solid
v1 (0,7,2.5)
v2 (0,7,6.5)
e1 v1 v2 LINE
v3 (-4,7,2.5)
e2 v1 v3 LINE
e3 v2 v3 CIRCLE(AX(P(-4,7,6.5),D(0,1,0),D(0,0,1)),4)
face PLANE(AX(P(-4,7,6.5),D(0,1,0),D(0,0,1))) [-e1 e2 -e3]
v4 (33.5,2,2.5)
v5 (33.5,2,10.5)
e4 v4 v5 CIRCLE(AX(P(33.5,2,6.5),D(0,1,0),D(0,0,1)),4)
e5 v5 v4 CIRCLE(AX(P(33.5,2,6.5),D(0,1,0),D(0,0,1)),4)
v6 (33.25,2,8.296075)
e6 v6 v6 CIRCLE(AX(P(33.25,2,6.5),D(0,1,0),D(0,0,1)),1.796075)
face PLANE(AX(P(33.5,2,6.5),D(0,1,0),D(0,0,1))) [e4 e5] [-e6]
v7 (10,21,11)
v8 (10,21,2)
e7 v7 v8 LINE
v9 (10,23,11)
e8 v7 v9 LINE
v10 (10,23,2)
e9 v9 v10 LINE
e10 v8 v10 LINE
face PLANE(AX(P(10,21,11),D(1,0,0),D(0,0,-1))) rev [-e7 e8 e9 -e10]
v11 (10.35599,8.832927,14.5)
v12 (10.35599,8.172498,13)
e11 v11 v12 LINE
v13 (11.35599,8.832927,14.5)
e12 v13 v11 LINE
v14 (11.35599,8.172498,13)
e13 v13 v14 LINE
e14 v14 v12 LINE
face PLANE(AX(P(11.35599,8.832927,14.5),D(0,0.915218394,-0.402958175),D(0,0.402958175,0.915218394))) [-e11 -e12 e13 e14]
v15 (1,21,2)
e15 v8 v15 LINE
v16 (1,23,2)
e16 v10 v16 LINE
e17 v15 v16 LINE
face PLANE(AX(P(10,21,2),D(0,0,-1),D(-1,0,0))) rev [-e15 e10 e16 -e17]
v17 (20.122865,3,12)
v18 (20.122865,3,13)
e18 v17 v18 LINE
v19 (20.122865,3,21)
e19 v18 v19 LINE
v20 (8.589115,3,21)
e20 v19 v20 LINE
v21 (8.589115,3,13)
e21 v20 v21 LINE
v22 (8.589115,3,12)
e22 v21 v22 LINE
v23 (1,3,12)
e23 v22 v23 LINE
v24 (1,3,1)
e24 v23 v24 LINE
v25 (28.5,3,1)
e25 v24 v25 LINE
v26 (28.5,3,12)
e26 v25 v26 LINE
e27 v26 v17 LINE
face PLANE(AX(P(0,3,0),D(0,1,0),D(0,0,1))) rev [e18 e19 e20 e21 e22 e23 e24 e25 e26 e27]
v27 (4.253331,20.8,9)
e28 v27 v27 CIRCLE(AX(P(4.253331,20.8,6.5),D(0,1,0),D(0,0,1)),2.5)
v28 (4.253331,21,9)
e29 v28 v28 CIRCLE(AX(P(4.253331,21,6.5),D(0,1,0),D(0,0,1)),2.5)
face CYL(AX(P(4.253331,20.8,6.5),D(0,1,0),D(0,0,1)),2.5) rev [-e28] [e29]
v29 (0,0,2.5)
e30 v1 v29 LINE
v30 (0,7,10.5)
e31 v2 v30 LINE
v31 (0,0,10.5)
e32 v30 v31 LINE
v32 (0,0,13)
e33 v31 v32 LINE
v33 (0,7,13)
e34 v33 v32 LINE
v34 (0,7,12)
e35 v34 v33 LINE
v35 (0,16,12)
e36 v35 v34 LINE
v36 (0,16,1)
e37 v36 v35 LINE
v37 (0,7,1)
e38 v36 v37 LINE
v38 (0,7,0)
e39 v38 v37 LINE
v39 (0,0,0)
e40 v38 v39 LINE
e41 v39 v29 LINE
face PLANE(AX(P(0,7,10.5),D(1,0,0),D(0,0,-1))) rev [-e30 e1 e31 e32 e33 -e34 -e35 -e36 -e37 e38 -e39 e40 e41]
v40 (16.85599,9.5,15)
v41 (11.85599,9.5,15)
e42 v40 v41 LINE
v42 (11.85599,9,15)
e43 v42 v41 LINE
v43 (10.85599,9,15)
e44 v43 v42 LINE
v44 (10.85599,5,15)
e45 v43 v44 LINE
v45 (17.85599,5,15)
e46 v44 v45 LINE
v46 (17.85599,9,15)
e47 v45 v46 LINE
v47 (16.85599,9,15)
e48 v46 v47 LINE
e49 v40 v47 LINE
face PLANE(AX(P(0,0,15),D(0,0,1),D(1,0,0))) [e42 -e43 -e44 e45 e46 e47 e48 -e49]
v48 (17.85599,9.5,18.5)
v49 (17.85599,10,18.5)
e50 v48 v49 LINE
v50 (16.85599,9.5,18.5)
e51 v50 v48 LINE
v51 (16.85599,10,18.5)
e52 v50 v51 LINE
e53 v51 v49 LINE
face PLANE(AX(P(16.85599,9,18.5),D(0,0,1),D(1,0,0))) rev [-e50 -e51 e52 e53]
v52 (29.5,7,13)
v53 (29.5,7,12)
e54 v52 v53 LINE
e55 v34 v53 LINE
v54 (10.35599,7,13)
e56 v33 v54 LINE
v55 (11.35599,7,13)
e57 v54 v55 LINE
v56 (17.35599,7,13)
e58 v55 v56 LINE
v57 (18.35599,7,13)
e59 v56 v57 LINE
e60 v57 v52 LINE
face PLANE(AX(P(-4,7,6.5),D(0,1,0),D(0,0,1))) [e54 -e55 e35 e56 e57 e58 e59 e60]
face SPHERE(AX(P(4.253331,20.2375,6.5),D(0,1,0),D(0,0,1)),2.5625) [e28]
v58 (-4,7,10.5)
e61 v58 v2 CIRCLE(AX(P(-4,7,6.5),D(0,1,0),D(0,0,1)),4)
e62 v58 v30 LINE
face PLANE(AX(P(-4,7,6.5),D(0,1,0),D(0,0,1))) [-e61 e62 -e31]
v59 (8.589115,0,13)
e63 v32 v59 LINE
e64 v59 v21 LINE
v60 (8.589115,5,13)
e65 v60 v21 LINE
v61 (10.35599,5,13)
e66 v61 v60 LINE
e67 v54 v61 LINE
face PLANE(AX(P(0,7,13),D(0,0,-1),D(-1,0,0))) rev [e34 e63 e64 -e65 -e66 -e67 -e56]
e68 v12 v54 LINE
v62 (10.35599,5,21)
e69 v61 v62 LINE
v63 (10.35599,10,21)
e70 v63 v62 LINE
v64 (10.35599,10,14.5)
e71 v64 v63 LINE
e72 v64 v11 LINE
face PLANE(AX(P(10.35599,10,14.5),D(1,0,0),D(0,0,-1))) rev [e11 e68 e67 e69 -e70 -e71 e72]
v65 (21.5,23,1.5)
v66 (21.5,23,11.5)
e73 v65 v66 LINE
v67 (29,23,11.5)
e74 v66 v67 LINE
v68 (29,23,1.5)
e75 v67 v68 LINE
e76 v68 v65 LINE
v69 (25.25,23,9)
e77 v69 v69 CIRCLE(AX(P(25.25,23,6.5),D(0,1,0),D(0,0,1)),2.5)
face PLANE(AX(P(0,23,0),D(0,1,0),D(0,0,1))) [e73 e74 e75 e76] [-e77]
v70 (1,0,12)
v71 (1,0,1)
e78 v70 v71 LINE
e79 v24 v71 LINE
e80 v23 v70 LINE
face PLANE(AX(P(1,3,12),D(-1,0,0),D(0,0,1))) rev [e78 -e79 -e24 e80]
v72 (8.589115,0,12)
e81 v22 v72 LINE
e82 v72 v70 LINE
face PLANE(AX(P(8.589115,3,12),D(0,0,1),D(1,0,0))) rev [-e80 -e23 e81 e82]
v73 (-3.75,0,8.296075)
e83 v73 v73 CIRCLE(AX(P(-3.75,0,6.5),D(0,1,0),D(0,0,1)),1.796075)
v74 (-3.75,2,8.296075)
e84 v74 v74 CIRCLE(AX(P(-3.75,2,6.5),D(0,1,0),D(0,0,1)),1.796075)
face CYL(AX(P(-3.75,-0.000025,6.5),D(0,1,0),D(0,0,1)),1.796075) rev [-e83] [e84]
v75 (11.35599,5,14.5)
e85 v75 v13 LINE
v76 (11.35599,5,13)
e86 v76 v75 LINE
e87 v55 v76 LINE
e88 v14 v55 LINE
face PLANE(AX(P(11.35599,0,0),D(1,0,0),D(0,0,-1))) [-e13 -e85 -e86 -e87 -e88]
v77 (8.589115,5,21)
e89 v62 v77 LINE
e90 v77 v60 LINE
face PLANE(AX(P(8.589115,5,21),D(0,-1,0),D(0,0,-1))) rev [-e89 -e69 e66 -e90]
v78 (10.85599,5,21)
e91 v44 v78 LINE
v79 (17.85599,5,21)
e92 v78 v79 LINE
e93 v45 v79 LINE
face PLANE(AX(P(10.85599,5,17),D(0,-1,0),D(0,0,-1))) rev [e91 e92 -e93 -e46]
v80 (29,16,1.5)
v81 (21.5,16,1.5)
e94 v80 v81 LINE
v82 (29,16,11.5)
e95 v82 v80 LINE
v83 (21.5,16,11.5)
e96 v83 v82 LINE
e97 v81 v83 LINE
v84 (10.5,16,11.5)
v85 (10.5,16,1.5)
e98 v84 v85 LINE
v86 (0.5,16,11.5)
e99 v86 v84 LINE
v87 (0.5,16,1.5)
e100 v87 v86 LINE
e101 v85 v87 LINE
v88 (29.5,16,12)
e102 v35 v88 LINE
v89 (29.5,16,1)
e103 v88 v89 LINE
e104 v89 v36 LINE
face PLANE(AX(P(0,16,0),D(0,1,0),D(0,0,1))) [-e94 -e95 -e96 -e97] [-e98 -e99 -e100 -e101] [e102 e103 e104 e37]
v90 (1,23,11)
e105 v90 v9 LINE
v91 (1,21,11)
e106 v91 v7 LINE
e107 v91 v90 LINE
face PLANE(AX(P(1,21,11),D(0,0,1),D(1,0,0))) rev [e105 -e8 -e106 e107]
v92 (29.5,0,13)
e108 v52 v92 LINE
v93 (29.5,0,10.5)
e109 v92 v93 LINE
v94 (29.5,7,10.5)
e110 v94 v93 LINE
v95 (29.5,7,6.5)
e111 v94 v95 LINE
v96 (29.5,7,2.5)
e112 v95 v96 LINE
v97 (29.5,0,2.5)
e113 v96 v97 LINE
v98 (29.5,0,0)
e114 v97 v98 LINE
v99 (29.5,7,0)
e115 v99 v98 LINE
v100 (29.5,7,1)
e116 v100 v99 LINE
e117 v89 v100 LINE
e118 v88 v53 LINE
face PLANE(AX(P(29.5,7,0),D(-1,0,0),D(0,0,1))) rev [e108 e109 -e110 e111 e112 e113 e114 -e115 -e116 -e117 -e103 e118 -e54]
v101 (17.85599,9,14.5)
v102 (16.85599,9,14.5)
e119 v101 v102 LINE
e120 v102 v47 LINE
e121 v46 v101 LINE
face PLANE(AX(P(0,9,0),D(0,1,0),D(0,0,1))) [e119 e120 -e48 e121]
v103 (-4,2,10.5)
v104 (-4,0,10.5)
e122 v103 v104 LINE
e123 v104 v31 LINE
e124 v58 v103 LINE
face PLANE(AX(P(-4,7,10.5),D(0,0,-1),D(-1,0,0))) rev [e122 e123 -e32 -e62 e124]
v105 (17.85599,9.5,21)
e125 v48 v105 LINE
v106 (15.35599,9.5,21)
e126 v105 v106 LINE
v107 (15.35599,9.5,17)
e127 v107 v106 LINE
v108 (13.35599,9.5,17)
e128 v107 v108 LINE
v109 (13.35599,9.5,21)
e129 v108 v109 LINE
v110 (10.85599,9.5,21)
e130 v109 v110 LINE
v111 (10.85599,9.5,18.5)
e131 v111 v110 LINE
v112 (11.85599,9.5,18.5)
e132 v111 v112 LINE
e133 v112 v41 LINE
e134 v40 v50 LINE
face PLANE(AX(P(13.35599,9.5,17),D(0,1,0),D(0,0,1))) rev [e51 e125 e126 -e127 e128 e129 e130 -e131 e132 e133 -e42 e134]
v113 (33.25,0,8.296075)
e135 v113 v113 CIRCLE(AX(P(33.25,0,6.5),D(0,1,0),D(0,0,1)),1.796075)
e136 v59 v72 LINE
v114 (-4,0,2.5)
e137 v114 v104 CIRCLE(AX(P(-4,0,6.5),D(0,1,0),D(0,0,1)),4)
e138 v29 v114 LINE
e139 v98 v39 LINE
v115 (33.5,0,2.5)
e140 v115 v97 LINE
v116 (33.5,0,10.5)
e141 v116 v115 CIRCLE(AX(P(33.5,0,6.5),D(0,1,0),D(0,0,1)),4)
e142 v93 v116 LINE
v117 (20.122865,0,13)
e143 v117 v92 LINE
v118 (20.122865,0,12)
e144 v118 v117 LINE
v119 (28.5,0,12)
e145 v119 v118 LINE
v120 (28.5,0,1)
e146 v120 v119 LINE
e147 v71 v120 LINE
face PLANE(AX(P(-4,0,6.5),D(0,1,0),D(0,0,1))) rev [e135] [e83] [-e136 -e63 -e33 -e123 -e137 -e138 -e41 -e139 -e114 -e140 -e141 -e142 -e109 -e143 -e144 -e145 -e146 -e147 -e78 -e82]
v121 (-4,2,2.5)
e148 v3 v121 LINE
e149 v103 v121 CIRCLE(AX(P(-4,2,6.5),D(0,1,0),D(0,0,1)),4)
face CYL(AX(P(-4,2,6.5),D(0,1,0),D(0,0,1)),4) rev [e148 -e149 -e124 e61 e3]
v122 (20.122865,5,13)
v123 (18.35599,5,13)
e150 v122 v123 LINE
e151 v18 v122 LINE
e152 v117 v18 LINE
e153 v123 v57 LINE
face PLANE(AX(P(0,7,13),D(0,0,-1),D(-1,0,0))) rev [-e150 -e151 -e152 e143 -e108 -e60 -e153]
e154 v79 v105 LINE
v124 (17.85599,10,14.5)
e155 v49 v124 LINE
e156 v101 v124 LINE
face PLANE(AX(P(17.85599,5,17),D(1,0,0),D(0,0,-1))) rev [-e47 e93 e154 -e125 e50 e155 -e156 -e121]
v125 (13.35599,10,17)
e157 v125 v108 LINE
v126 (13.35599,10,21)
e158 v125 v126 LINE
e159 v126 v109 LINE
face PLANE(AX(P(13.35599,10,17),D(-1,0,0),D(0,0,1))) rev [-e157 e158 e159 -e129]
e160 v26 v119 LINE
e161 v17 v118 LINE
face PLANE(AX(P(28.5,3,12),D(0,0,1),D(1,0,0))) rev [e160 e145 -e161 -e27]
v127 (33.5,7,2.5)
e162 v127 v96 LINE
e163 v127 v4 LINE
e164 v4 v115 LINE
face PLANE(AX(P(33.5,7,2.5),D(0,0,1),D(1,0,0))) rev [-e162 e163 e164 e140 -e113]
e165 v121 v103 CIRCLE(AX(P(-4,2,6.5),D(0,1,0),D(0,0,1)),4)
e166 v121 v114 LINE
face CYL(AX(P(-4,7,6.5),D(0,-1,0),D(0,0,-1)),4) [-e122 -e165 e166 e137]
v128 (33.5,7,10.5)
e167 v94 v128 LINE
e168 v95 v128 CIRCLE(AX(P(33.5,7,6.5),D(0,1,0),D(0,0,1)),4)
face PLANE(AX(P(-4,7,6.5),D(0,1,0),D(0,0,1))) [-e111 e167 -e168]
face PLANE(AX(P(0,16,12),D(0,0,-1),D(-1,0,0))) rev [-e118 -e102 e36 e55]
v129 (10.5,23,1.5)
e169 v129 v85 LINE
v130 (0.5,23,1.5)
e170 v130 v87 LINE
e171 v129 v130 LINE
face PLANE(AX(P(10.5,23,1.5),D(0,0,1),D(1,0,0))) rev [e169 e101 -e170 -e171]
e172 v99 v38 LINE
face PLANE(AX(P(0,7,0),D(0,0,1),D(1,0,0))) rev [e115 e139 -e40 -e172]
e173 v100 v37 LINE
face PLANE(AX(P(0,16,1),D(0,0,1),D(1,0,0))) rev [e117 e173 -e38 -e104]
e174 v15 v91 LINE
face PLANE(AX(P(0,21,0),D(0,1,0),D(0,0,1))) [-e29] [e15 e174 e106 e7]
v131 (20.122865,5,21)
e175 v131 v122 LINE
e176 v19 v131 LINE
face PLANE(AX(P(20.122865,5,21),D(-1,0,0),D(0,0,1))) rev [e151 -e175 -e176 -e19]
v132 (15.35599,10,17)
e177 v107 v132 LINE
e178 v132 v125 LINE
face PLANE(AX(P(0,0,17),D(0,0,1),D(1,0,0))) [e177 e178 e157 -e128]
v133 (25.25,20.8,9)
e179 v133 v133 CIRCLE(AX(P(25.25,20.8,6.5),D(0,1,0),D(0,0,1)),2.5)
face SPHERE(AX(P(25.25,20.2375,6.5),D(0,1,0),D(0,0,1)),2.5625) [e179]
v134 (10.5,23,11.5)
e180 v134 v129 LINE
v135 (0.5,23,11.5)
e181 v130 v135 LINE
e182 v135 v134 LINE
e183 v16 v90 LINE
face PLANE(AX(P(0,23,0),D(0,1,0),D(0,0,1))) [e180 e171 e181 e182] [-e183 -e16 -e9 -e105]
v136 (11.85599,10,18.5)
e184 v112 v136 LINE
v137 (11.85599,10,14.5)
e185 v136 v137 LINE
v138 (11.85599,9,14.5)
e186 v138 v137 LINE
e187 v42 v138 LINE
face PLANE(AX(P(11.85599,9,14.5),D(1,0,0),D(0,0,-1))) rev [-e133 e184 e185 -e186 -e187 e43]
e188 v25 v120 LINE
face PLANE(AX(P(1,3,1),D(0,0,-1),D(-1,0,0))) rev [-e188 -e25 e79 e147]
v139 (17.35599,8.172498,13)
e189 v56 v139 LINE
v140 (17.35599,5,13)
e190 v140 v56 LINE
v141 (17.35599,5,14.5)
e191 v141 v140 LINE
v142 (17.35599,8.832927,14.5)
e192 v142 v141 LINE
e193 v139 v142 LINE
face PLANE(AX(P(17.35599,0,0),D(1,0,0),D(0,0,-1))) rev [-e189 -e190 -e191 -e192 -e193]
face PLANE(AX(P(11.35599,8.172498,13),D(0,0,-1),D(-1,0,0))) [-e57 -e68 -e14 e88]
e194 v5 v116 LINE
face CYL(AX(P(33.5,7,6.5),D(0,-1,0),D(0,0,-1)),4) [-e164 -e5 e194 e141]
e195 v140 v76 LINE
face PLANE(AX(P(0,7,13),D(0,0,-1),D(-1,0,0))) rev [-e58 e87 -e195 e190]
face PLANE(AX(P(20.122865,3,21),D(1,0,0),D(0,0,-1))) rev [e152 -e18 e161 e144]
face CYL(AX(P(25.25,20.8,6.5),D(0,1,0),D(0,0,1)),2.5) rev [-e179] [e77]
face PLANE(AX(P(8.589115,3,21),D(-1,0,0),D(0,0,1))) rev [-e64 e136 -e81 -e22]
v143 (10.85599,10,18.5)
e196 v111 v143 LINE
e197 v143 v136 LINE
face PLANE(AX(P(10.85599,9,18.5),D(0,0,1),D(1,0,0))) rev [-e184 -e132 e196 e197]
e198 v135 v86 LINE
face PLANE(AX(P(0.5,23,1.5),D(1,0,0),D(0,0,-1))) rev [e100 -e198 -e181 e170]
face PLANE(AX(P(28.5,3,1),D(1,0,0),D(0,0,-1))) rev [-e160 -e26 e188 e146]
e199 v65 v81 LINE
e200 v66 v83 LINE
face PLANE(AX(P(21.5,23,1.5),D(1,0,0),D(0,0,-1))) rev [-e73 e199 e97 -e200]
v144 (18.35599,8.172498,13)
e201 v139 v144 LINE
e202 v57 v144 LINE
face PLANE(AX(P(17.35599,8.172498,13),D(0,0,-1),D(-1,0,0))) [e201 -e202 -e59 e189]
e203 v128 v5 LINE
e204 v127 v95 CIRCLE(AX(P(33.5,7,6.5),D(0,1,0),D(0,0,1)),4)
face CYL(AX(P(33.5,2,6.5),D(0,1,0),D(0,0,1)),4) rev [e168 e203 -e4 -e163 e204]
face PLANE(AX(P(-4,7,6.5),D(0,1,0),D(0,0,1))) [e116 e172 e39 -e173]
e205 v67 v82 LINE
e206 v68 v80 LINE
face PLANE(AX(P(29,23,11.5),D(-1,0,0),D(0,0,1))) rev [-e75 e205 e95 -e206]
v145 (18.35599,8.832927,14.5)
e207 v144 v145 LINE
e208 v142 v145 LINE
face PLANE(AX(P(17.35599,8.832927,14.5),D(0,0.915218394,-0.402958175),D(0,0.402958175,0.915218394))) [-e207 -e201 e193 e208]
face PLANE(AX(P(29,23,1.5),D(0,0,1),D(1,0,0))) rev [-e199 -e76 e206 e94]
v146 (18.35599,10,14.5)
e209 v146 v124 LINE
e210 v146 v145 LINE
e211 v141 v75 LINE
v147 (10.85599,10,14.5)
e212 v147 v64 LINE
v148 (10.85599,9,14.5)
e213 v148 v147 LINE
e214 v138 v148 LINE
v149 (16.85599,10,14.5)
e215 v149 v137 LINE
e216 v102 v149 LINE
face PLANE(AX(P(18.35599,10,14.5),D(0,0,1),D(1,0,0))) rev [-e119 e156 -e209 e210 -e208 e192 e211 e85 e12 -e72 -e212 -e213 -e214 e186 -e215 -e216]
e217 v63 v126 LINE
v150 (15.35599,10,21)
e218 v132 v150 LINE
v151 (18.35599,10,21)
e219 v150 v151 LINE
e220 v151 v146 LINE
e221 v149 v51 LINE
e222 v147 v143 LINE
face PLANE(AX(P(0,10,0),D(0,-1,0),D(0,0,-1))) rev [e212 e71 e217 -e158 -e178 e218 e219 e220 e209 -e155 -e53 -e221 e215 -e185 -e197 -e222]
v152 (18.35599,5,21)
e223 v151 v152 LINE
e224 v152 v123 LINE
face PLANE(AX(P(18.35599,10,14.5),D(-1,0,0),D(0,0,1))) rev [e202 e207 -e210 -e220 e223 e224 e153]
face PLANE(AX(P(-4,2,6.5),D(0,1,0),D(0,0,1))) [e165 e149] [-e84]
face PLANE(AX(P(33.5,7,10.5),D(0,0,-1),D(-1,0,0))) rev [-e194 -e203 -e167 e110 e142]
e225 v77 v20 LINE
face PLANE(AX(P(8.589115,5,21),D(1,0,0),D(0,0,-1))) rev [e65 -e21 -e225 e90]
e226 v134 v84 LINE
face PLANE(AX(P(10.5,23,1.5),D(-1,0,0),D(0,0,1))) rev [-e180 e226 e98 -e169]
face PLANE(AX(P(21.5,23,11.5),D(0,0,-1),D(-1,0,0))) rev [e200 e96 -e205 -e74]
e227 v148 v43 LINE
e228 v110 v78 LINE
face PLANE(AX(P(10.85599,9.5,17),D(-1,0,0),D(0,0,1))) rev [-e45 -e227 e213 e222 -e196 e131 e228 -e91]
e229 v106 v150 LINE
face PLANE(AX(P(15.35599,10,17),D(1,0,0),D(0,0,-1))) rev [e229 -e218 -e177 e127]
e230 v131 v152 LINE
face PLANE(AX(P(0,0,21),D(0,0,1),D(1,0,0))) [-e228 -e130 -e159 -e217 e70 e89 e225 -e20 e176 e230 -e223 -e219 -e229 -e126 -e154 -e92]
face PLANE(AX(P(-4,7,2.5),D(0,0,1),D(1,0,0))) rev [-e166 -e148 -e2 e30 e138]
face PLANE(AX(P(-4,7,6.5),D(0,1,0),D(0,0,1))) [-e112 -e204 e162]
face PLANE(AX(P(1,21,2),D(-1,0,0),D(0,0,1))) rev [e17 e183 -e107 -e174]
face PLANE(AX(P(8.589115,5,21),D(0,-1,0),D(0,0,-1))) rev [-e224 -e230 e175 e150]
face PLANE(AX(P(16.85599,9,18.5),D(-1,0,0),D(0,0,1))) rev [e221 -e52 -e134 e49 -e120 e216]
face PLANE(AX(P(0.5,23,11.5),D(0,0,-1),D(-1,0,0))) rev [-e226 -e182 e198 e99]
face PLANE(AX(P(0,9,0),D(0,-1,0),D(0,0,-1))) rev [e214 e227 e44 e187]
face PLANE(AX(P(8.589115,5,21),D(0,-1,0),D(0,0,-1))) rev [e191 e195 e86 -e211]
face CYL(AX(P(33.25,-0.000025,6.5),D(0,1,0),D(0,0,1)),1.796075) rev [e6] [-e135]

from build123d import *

# Parameters (mm, degrees)
EXTRUDE_1_DEPTH     = 7
CUT_EXTRUDE_START   = -5
SKETCH_2_R          = 4
CUT_EXTRUDE_1_DEPTH = 5
SKETCH_3_W          = 29.5
SKETCH_3_H          = 11
EXTRUDE_2_DEPTH     = 9
SKETCH_4_W          = 7.5
SKETCH_4_H          = 10
SKETCH_4_W_2        = 10
EXTRUDE_3_DEPTH     = 7
SKETCH_5_W          = 9
SKETCH_5_H          = 9
CUT_EXTRUDE_2_DEPTH = 2
SKETCH_6_R          = 2.5
CUT_EXTRUDE_3_DEPTH = 2.2
SKETCH_7_R          = 1.796075295
CUT_EXTRUDE_4_DEPTH = 45.902672526
SKETCH_8_W          = 11.533749137
SKETCH_8_H          = 5
EXTRUDE_4_DEPTH     = 8
CUT_EXTRUDE_5_DEPTH = 3
SKETCH_11_W         = 8
SKETCH_11_H         = 6.5
EXTRUDE_6_DEPTH     = 5
EXTRUDE_7_DEPTH     = 1
EXTRUDE_8_DEPTH     = 1
CUT_EXTRUDE_6_DEPTH = 4
SKETCH_15_W         = 7
SKETCH_15_H         = 4.5
CUT_EXTRUDE_7_DEPTH = 2
SKETCH_16_W         = 1
SKETCH_16_H         = 4
CUT_EXTRUDE_8_DEPTH = 1


# Read off the part's stored shape, not the designer's step: 圆顶1, 圆顶2
with BuildPart() as part:
    # 草图1 → 凸台-拉伸1 (new body)
    with BuildSketch(Plane(origin=(0, 0, 0), x_dir=(1, 0, 0), z_dir=(0, 1, 0))):
        with BuildLine():
            Line((0, 0), (29.5, 0))
            Line((29.5, 0), (29.5, -2.5))
            Line((29.5, -2.5), (33.5, -2.5))
            ThreePointArc((33.5, -2.5), (37.5, -6.5), (33.5, -10.5))
            Line((33.5, -10.5), (29.5, -10.5))
            Line((29.5, -10.5), (29.5, -13))
            Line((29.5, -13), (0, -13))
            Line((0, -13), (0, -10.5))
            Line((0, -10.5), (-4, -10.5))
            ThreePointArc((-4, -10.5), (-8, -6.5), (-4, -2.5))
            Line((-4, -2.5), (0, -2.5))
            Line((0, -2.5), (0, 0))
        make_face()
    extrude(amount=EXTRUDE_1_DEPTH)

    # 草图2 → 切除-拉伸1 (cut)
    with BuildSketch(Plane(origin=(0, 7, 0), x_dir=(1, 0, 0), z_dir=(0, 1, 0)).offset(CUT_EXTRUDE_START)):
        with Locations((-4, -6.5)):
            Circle(SKETCH_2_R)
        with Locations((33.5, -6.5)):
            Circle(SKETCH_2_R)
    extrude(amount=CUT_EXTRUDE_1_DEPTH, mode=Mode.SUBTRACT)

    # 草图3 → 凸台-拉伸2 (add)
    with BuildSketch(Plane(origin=(0, 7, 0), x_dir=(1, 0, 0), z_dir=(0, 1, 0))):
        with Locations((14.75, -6.5)):
            Rectangle(SKETCH_3_W, SKETCH_3_H)
    extrude(amount=EXTRUDE_2_DEPTH)

    # 草图4 → 凸台-拉伸3 (add)
    with BuildSketch(Plane(origin=(0, 16, 0), x_dir=(1, 0, 0), z_dir=(0, 1, 0))):
        with Locations((25.25, -6.5)):
            Rectangle(SKETCH_4_W, SKETCH_4_H)
        with Locations((5.5, -6.5)):
            Rectangle(SKETCH_4_W_2, SKETCH_4_H)
    extrude(amount=EXTRUDE_3_DEPTH)

    # 草图5 → 切除-拉伸2 (cut)
    with BuildSketch(Plane(origin=(0, 23, 0), x_dir=(1, 0, 0), z_dir=(0, 1, 0))):
        with Locations((5.5, -6.5)):
            Rectangle(SKETCH_5_W, SKETCH_5_H)
    extrude(amount=-CUT_EXTRUDE_2_DEPTH, mode=Mode.SUBTRACT)

    # 草图6 → 切除-拉伸3 (cut)
    with BuildSketch(Plane(origin=(0, 23, 0), x_dir=(1, 0, 0), z_dir=(0, 1, 0))):
        with Locations(Location((25.25, -6.5, 0), (0, 0, 270))):
            Circle(SKETCH_6_R)
        with Locations(Location((4.253331237, -6.5, 0), (0, 0, 270))):
            Circle(SKETCH_6_R)
    extrude(amount=-CUT_EXTRUDE_3_DEPTH, mode=Mode.SUBTRACT)

    # 圆顶1 outline → 圆顶1 (revolve)
    with BuildSketch(Plane(origin=(4.253331237, 0, 6.5), x_dir=(1, 0, 0), z_dir=(0, 0, 1))):
        with BuildLine():
            Line((0, 20.8), (2.500000001, 20.799999998))
            ThreePointArc((2.500000001, 20.799999998), (1.60078106, 22.238476323), (0, 22.8))
            Line((0, 22.8), (0, 20.8))
        make_face()
    revolve(axis=Axis((4.253331237, 0, 6.5), (0, 1, 0)))

    # 圆顶2 outline → 圆顶2 (revolve)
    with BuildSketch(Plane(origin=(25.25, 0, 6.5), x_dir=(1, 0, 0), z_dir=(0, 0, 1))):
        with BuildLine():
            Line((0, 20.8), (2.500000001, 20.799999997))
            ThreePointArc((2.500000001, 20.799999997), (1.60078106, 22.238476323), (0, 22.8))
            Line((0, 22.8), (0, 20.8))
        make_face()
    revolve(axis=Axis((25.25, 0, 6.5), (0, 1, 0)))

    # 草图7 → 切除-拉伸4 (cut, through all)
    with BuildSketch(Plane(origin=(0, 2, 0), x_dir=(1, 0, 0), z_dir=(0, 1, 0))):
        with Locations(Location((-3.75, -6.5, 0), (0, 0, 270))):
            Circle(SKETCH_7_R)
        with Locations(Location((33.25, -6.5, 0), (0, 0, 270))):
            Circle(SKETCH_7_R)
    extrude(amount=-CUT_EXTRUDE_4_DEPTH, mode=Mode.SUBTRACT)

    # 草图8 → 凸台-拉伸4 (add)
    with BuildSketch(Plane.XY.offset(13)):
        with Locations((14.355989937, 2.5)):
            Rectangle(SKETCH_8_W, SKETCH_8_H)
    extrude(amount=EXTRUDE_4_DEPTH)

    # 草图10 → 切除-拉伸5 (cut)
    with BuildSketch(Plane.XZ):
        Polygon((8.589115368, 21), (8.589115368, 12), (1, 12), (1, 1), (28.5, 1), (28.5, 12), (20.122864505, 12), (20.122864505, 21), align=None)
    extrude(amount=-CUT_EXTRUDE_5_DEPTH, mode=Mode.SUBTRACT)

    # 草图11 → 凸台-拉伸6 (add)
    with BuildSketch(Plane(origin=(0, 5, 0), x_dir=(1, 0, 0), z_dir=(0, 1, 0))):
        with Locations((14.355989936, -17.75)):
            Rectangle(SKETCH_11_W, SKETCH_11_H)
    extrude(amount=EXTRUDE_6_DEPTH)

    # 草图12 → 凸台-拉伸7 (add)
    with BuildSketch(Plane(origin=(18.355989936, 0, 0), x_dir=(0, 0, -1), z_dir=(1, 0, 0))):
        Polygon((-14.5, 8.832927064), (-13, 8.172497524), (-13, 5), (-14.5, 5), align=None)
    extrude(amount=-EXTRUDE_7_DEPTH)

    # 草图13 → 凸台-拉伸8 (add)
    with BuildSketch(Plane.ZY.offset(-10.355989936)):
        Polygon((14.5, 8.832927064), (13, 8.172497524), (13, 5), (14.5, 5), align=None)
    extrude(amount=-EXTRUDE_8_DEPTH)

    # 草图14 → 切除-拉伸6 (cut)
    with BuildSketch(Plane.XY.offset(21)):
        Polygon((10.855989936, 5), (17.855989936, 5), (17.855989936, 9.5), (15.355989936, 9.5), (15.355989936, 10), (13.355989936, 10), (13.355989936, 9.5), (10.855989936, 9.5), align=None)
    extrude(amount=-CUT_EXTRUDE_6_DEPTH, mode=Mode.SUBTRACT)

    # 草图15 → 切除-拉伸7 (cut)
    with BuildSketch(Plane.XY.offset(17)):
        with Locations((14.355989936, 7.25)):
            Rectangle(SKETCH_15_W, SKETCH_15_H)
    extrude(amount=-CUT_EXTRUDE_7_DEPTH, mode=Mode.SUBTRACT)

    # 草图16 → 切除-拉伸8 (cut)
    with BuildSketch(Plane(origin=(0, 10, 0), x_dir=(1, 0, 0), z_dir=(0, 1, 0))):
        with Locations((11.355989936, -16.5)):
            Rectangle(SKETCH_16_W, SKETCH_16_H)
        with Locations((17.355989936, -16.5)):
            Rectangle(SKETCH_16_W, SKETCH_16_H)
    extrude(amount=-CUT_EXTRUDE_8_DEPTH, mode=Mode.SUBTRACT)


solid = part.part
